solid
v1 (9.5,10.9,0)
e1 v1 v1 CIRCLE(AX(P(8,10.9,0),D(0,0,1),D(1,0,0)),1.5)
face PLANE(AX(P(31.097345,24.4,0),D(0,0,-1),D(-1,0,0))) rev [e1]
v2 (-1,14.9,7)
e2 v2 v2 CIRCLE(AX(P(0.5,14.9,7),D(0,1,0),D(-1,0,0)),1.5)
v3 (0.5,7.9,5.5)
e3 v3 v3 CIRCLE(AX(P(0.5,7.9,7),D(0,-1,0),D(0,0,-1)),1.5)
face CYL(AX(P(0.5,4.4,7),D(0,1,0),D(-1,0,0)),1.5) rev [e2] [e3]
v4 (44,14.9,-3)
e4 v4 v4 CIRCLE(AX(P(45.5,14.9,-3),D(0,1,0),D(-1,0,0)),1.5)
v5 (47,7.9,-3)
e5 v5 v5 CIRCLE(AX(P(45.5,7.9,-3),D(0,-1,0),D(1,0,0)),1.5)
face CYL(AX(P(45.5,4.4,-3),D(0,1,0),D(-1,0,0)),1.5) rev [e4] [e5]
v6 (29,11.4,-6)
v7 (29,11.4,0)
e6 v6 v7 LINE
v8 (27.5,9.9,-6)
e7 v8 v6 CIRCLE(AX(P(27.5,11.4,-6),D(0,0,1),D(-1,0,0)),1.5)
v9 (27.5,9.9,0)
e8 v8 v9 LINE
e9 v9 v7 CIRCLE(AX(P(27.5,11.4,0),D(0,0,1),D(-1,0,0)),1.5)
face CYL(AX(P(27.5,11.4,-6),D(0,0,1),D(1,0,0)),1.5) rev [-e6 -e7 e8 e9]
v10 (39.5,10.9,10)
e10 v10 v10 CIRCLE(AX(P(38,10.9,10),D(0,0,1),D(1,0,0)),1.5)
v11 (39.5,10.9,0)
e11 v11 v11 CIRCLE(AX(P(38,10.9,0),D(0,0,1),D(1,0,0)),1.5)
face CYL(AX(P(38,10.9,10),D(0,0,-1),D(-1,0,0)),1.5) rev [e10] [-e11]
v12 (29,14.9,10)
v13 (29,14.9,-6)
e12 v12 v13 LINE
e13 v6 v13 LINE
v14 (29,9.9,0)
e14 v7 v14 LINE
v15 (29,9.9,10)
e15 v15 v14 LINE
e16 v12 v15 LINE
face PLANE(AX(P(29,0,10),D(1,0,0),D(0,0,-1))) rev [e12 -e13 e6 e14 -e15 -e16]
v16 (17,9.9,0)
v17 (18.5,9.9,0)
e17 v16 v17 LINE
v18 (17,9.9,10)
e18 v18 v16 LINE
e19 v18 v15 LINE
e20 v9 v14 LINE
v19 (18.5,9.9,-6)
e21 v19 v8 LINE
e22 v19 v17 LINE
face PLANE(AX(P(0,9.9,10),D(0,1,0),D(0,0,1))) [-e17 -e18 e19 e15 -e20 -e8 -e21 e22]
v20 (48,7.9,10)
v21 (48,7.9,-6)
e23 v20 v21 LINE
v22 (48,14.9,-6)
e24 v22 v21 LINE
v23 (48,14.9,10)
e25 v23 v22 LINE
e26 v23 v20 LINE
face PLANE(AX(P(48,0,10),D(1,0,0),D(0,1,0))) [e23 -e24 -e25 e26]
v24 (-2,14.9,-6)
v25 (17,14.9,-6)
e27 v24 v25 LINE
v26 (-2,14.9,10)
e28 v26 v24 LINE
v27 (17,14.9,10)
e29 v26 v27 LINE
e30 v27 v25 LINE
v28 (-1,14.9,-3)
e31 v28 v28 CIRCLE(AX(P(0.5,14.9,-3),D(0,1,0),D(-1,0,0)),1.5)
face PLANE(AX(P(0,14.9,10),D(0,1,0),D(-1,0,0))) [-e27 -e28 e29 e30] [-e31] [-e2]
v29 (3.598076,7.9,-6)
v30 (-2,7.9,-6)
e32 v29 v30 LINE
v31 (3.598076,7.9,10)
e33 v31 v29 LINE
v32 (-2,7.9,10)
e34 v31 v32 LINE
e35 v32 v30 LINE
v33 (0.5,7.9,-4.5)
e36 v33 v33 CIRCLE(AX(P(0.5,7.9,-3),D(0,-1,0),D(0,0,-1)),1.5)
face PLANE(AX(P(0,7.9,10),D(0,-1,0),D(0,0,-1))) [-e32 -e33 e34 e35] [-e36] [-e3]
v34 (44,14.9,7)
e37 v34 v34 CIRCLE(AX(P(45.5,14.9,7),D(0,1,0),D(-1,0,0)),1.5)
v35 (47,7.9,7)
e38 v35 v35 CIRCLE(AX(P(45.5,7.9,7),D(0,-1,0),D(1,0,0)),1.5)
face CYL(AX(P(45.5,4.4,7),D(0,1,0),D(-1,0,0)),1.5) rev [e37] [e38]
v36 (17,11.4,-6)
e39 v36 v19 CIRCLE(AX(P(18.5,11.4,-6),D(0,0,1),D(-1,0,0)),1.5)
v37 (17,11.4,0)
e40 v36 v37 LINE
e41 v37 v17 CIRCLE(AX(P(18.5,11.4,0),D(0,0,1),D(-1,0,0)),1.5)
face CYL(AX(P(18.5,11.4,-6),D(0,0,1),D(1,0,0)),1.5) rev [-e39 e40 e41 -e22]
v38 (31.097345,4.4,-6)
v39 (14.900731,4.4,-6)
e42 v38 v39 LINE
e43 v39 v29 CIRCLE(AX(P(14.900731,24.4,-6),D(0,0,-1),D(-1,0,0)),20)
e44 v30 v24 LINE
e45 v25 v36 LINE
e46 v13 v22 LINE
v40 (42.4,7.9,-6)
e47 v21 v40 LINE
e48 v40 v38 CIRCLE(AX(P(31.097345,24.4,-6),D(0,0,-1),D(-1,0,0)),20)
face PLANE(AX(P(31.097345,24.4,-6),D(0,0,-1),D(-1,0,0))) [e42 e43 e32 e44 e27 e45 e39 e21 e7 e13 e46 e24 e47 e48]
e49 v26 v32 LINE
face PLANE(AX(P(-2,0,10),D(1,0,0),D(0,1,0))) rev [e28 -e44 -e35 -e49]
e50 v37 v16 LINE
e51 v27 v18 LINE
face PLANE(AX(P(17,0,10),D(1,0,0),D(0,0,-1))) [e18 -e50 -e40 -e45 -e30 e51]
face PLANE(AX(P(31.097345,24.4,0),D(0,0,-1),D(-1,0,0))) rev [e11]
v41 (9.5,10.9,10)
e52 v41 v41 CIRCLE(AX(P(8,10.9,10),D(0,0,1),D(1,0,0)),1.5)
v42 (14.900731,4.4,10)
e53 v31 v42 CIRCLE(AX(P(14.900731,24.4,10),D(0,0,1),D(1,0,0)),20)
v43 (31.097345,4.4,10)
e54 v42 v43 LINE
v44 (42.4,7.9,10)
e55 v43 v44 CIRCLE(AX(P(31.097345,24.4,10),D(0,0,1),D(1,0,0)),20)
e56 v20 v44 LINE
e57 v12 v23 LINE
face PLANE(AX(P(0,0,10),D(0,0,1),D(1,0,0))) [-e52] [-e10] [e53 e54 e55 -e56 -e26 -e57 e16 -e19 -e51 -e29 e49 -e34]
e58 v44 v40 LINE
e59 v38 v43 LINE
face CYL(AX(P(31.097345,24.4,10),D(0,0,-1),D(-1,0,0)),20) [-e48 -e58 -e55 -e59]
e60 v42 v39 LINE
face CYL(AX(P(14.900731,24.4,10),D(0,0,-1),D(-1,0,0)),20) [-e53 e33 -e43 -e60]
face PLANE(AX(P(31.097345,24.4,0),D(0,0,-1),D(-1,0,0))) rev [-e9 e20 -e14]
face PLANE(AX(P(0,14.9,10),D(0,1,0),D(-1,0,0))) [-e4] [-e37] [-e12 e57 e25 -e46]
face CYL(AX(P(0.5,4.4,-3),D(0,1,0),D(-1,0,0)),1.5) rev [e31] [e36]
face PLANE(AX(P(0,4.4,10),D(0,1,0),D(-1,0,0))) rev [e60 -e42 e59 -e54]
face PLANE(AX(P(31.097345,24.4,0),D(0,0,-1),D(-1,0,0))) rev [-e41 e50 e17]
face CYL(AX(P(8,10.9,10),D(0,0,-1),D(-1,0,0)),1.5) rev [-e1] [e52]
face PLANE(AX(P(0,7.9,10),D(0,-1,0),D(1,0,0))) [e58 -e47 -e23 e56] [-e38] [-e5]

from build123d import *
from build123d.topology import SkipClean

# Parameters (mm, degrees)
SKETCH7_R               = 1.5
BOSS_EXTRUDE11_DEPTH    = 10
FILLET1_R               = 20
BOSS_EXTRUDE12_START    = 6
BOSS_EXTRUDE12_DEPTH    = 6
CUT_EXTRUDE1_DEPTH      = 51.142297514
CUT_EXTRUDE1_DEPTH_BACK = 51.142297514
SKETCH10_R              = 1.5


with BuildPart() as part:
    # Sketch7 → Boss-Extrude11 (new body)
    with BuildSketch(Plane.XY):
        Polygon((11, 14.9), (-2, 14.9), (-2, 7.9), (3.598076211, 7.9), (3.598076211, 4.4), (42.4, 4.4), (42.4, 7.9), (48, 7.9), (48, 14.9), (35, 14.9), (29, 14.9), (29, 9.9), (17, 9.9), (17, 14.9), align=None)
        with Locations((8, 10.9)):
            Circle(SKETCH7_R, mode=Mode.SUBTRACT)
        with Locations((38, 10.9)):
            Circle(SKETCH7_R, mode=Mode.SUBTRACT)
    extrude(amount=BOSS_EXTRUDE11_DEPTH)

    # Fillet1
    # the kernel refuses this fillet: 20 mm, written as the material it takes off along each edge
    with BuildSketch(Plane(origin=(42.4, 4.4, -28.256636389), x_dir=(-1.4210854715172548e-12, 1.0, 0), z_dir=(0, 0, 1))) as fillet1_piece_1:
        with BuildLine():
            CenterArc((20, 11.302654555), FILLET1_R, 180, 34.41150867)
            Line((0, 11.302654555), (-0.4, 11.302654555))
            Line((-0.4, 11.302654555), (-0.4, 0))
            Line((-0.4, 0), (0, -0.4))
            ThreePointArc((0, -0.4), (1.75, -0.4), (3.17, -0.226053091))
            Line((3.17, -0.226053091), (3.5, 0))
        make_face()
    extrude(amount=66.513272777, mode=Mode.SUBTRACT)
    with BuildSketch(Plane(origin=(3.598076211, 4.4, -28.256636389), x_dir=(1, 0, 0), z_dir=(0, 0, 1))) as fillet1_piece_2:
        with BuildLine():
            CenterArc((11.302654555, 20), FILLET1_R, 235.58849133, 34.41150867)
            Line((0, 3.5), (-0.226053091, 3.17))
            ThreePointArc((-0.226053091, 3.17), (-0.4, 1.75), (-0.4, 0))
            Line((-0.4, 0), (0, -0.4))
            Line((0, -0.4), (11.302654555, -0.4))
            Line((11.302654555, -0.4), (11.302654555, 0))
        make_face()
    extrude(amount=66.513272777, mode=Mode.SUBTRACT)

    # Sketch9 → Boss-Extrude12 (add)
    with SkipClean():  # the faces are left unmerged after this step: merging them gives an invalid solid
        with BuildSketch(Plane(origin=(0, 0, 0), x_dir=(-1, 0, 0), z_dir=(0, 0, -1)).offset(BOSS_EXTRUDE12_START)):
            with BuildLine():
                Line((-48, 7.9), (-42.4, 7.9))
                ThreePointArc((-42.4, 7.9), (-37.013425228, 5.295026825), (-31.097345445, 4.4))
                Line((-31.097345445, 4.4), (-14.900730767, 4.4))
                ThreePointArc((-14.900730767, 4.4), (-8.984650984, 5.295026825), (-3.598076211, 7.9))
                Line((-3.598076211, 7.9), (2, 7.9))
                Line((2, 7.9), (2, 14.9))
                Line((2, 14.9), (-17, 14.9))
                Line((-17, 14.9), (-17, 11.4))
                ThreePointArc((-17, 11.4), (-17.439339828, 10.339339828), (-18.5, 9.9))
                Line((-18.5, 9.9), (-27.5, 9.9))
                ThreePointArc((-27.5, 9.9), (-28.560660172, 10.339339828), (-29, 11.4))
                Line((-29, 11.4), (-29, 14.9))
                Line((-29, 14.9), (-48, 14.9))
                Line((-48, 14.9), (-48, 7.9))
            make_face()
        extrude(amount=-BOSS_EXTRUDE12_DEPTH)

    # Sketch10 → Cut-Extrude1 (cut, two sides: drawn at the far end of the back side and taken through both)
    with SkipClean():  # the faces are left unmerged after this step: merging them gives an invalid solid
        with BuildSketch(Plane(origin=(0, 14.9, 0), x_dir=(1, 0, 0), z_dir=(0, 1, 0)).offset(-CUT_EXTRUDE1_DEPTH_BACK)):
            with Locations(Location((0.5, -7, 0), (0, 0, 180))):
                Circle(SKETCH10_R)
            with Locations(Location((0.5, 3, 0), (0, 0, 180))):
                Circle(SKETCH10_R)
            with Locations(Location((45.5, -7, 0), (0, 0, 180))):
                Circle(SKETCH10_R)
            with Locations(Location((45.5, 3, 0), (0, 0, 180))):
                Circle(SKETCH10_R)
        extrude(amount=CUT_EXTRUDE1_DEPTH + CUT_EXTRUDE1_DEPTH_BACK, mode=Mode.SUBTRACT)


solid = part.part
